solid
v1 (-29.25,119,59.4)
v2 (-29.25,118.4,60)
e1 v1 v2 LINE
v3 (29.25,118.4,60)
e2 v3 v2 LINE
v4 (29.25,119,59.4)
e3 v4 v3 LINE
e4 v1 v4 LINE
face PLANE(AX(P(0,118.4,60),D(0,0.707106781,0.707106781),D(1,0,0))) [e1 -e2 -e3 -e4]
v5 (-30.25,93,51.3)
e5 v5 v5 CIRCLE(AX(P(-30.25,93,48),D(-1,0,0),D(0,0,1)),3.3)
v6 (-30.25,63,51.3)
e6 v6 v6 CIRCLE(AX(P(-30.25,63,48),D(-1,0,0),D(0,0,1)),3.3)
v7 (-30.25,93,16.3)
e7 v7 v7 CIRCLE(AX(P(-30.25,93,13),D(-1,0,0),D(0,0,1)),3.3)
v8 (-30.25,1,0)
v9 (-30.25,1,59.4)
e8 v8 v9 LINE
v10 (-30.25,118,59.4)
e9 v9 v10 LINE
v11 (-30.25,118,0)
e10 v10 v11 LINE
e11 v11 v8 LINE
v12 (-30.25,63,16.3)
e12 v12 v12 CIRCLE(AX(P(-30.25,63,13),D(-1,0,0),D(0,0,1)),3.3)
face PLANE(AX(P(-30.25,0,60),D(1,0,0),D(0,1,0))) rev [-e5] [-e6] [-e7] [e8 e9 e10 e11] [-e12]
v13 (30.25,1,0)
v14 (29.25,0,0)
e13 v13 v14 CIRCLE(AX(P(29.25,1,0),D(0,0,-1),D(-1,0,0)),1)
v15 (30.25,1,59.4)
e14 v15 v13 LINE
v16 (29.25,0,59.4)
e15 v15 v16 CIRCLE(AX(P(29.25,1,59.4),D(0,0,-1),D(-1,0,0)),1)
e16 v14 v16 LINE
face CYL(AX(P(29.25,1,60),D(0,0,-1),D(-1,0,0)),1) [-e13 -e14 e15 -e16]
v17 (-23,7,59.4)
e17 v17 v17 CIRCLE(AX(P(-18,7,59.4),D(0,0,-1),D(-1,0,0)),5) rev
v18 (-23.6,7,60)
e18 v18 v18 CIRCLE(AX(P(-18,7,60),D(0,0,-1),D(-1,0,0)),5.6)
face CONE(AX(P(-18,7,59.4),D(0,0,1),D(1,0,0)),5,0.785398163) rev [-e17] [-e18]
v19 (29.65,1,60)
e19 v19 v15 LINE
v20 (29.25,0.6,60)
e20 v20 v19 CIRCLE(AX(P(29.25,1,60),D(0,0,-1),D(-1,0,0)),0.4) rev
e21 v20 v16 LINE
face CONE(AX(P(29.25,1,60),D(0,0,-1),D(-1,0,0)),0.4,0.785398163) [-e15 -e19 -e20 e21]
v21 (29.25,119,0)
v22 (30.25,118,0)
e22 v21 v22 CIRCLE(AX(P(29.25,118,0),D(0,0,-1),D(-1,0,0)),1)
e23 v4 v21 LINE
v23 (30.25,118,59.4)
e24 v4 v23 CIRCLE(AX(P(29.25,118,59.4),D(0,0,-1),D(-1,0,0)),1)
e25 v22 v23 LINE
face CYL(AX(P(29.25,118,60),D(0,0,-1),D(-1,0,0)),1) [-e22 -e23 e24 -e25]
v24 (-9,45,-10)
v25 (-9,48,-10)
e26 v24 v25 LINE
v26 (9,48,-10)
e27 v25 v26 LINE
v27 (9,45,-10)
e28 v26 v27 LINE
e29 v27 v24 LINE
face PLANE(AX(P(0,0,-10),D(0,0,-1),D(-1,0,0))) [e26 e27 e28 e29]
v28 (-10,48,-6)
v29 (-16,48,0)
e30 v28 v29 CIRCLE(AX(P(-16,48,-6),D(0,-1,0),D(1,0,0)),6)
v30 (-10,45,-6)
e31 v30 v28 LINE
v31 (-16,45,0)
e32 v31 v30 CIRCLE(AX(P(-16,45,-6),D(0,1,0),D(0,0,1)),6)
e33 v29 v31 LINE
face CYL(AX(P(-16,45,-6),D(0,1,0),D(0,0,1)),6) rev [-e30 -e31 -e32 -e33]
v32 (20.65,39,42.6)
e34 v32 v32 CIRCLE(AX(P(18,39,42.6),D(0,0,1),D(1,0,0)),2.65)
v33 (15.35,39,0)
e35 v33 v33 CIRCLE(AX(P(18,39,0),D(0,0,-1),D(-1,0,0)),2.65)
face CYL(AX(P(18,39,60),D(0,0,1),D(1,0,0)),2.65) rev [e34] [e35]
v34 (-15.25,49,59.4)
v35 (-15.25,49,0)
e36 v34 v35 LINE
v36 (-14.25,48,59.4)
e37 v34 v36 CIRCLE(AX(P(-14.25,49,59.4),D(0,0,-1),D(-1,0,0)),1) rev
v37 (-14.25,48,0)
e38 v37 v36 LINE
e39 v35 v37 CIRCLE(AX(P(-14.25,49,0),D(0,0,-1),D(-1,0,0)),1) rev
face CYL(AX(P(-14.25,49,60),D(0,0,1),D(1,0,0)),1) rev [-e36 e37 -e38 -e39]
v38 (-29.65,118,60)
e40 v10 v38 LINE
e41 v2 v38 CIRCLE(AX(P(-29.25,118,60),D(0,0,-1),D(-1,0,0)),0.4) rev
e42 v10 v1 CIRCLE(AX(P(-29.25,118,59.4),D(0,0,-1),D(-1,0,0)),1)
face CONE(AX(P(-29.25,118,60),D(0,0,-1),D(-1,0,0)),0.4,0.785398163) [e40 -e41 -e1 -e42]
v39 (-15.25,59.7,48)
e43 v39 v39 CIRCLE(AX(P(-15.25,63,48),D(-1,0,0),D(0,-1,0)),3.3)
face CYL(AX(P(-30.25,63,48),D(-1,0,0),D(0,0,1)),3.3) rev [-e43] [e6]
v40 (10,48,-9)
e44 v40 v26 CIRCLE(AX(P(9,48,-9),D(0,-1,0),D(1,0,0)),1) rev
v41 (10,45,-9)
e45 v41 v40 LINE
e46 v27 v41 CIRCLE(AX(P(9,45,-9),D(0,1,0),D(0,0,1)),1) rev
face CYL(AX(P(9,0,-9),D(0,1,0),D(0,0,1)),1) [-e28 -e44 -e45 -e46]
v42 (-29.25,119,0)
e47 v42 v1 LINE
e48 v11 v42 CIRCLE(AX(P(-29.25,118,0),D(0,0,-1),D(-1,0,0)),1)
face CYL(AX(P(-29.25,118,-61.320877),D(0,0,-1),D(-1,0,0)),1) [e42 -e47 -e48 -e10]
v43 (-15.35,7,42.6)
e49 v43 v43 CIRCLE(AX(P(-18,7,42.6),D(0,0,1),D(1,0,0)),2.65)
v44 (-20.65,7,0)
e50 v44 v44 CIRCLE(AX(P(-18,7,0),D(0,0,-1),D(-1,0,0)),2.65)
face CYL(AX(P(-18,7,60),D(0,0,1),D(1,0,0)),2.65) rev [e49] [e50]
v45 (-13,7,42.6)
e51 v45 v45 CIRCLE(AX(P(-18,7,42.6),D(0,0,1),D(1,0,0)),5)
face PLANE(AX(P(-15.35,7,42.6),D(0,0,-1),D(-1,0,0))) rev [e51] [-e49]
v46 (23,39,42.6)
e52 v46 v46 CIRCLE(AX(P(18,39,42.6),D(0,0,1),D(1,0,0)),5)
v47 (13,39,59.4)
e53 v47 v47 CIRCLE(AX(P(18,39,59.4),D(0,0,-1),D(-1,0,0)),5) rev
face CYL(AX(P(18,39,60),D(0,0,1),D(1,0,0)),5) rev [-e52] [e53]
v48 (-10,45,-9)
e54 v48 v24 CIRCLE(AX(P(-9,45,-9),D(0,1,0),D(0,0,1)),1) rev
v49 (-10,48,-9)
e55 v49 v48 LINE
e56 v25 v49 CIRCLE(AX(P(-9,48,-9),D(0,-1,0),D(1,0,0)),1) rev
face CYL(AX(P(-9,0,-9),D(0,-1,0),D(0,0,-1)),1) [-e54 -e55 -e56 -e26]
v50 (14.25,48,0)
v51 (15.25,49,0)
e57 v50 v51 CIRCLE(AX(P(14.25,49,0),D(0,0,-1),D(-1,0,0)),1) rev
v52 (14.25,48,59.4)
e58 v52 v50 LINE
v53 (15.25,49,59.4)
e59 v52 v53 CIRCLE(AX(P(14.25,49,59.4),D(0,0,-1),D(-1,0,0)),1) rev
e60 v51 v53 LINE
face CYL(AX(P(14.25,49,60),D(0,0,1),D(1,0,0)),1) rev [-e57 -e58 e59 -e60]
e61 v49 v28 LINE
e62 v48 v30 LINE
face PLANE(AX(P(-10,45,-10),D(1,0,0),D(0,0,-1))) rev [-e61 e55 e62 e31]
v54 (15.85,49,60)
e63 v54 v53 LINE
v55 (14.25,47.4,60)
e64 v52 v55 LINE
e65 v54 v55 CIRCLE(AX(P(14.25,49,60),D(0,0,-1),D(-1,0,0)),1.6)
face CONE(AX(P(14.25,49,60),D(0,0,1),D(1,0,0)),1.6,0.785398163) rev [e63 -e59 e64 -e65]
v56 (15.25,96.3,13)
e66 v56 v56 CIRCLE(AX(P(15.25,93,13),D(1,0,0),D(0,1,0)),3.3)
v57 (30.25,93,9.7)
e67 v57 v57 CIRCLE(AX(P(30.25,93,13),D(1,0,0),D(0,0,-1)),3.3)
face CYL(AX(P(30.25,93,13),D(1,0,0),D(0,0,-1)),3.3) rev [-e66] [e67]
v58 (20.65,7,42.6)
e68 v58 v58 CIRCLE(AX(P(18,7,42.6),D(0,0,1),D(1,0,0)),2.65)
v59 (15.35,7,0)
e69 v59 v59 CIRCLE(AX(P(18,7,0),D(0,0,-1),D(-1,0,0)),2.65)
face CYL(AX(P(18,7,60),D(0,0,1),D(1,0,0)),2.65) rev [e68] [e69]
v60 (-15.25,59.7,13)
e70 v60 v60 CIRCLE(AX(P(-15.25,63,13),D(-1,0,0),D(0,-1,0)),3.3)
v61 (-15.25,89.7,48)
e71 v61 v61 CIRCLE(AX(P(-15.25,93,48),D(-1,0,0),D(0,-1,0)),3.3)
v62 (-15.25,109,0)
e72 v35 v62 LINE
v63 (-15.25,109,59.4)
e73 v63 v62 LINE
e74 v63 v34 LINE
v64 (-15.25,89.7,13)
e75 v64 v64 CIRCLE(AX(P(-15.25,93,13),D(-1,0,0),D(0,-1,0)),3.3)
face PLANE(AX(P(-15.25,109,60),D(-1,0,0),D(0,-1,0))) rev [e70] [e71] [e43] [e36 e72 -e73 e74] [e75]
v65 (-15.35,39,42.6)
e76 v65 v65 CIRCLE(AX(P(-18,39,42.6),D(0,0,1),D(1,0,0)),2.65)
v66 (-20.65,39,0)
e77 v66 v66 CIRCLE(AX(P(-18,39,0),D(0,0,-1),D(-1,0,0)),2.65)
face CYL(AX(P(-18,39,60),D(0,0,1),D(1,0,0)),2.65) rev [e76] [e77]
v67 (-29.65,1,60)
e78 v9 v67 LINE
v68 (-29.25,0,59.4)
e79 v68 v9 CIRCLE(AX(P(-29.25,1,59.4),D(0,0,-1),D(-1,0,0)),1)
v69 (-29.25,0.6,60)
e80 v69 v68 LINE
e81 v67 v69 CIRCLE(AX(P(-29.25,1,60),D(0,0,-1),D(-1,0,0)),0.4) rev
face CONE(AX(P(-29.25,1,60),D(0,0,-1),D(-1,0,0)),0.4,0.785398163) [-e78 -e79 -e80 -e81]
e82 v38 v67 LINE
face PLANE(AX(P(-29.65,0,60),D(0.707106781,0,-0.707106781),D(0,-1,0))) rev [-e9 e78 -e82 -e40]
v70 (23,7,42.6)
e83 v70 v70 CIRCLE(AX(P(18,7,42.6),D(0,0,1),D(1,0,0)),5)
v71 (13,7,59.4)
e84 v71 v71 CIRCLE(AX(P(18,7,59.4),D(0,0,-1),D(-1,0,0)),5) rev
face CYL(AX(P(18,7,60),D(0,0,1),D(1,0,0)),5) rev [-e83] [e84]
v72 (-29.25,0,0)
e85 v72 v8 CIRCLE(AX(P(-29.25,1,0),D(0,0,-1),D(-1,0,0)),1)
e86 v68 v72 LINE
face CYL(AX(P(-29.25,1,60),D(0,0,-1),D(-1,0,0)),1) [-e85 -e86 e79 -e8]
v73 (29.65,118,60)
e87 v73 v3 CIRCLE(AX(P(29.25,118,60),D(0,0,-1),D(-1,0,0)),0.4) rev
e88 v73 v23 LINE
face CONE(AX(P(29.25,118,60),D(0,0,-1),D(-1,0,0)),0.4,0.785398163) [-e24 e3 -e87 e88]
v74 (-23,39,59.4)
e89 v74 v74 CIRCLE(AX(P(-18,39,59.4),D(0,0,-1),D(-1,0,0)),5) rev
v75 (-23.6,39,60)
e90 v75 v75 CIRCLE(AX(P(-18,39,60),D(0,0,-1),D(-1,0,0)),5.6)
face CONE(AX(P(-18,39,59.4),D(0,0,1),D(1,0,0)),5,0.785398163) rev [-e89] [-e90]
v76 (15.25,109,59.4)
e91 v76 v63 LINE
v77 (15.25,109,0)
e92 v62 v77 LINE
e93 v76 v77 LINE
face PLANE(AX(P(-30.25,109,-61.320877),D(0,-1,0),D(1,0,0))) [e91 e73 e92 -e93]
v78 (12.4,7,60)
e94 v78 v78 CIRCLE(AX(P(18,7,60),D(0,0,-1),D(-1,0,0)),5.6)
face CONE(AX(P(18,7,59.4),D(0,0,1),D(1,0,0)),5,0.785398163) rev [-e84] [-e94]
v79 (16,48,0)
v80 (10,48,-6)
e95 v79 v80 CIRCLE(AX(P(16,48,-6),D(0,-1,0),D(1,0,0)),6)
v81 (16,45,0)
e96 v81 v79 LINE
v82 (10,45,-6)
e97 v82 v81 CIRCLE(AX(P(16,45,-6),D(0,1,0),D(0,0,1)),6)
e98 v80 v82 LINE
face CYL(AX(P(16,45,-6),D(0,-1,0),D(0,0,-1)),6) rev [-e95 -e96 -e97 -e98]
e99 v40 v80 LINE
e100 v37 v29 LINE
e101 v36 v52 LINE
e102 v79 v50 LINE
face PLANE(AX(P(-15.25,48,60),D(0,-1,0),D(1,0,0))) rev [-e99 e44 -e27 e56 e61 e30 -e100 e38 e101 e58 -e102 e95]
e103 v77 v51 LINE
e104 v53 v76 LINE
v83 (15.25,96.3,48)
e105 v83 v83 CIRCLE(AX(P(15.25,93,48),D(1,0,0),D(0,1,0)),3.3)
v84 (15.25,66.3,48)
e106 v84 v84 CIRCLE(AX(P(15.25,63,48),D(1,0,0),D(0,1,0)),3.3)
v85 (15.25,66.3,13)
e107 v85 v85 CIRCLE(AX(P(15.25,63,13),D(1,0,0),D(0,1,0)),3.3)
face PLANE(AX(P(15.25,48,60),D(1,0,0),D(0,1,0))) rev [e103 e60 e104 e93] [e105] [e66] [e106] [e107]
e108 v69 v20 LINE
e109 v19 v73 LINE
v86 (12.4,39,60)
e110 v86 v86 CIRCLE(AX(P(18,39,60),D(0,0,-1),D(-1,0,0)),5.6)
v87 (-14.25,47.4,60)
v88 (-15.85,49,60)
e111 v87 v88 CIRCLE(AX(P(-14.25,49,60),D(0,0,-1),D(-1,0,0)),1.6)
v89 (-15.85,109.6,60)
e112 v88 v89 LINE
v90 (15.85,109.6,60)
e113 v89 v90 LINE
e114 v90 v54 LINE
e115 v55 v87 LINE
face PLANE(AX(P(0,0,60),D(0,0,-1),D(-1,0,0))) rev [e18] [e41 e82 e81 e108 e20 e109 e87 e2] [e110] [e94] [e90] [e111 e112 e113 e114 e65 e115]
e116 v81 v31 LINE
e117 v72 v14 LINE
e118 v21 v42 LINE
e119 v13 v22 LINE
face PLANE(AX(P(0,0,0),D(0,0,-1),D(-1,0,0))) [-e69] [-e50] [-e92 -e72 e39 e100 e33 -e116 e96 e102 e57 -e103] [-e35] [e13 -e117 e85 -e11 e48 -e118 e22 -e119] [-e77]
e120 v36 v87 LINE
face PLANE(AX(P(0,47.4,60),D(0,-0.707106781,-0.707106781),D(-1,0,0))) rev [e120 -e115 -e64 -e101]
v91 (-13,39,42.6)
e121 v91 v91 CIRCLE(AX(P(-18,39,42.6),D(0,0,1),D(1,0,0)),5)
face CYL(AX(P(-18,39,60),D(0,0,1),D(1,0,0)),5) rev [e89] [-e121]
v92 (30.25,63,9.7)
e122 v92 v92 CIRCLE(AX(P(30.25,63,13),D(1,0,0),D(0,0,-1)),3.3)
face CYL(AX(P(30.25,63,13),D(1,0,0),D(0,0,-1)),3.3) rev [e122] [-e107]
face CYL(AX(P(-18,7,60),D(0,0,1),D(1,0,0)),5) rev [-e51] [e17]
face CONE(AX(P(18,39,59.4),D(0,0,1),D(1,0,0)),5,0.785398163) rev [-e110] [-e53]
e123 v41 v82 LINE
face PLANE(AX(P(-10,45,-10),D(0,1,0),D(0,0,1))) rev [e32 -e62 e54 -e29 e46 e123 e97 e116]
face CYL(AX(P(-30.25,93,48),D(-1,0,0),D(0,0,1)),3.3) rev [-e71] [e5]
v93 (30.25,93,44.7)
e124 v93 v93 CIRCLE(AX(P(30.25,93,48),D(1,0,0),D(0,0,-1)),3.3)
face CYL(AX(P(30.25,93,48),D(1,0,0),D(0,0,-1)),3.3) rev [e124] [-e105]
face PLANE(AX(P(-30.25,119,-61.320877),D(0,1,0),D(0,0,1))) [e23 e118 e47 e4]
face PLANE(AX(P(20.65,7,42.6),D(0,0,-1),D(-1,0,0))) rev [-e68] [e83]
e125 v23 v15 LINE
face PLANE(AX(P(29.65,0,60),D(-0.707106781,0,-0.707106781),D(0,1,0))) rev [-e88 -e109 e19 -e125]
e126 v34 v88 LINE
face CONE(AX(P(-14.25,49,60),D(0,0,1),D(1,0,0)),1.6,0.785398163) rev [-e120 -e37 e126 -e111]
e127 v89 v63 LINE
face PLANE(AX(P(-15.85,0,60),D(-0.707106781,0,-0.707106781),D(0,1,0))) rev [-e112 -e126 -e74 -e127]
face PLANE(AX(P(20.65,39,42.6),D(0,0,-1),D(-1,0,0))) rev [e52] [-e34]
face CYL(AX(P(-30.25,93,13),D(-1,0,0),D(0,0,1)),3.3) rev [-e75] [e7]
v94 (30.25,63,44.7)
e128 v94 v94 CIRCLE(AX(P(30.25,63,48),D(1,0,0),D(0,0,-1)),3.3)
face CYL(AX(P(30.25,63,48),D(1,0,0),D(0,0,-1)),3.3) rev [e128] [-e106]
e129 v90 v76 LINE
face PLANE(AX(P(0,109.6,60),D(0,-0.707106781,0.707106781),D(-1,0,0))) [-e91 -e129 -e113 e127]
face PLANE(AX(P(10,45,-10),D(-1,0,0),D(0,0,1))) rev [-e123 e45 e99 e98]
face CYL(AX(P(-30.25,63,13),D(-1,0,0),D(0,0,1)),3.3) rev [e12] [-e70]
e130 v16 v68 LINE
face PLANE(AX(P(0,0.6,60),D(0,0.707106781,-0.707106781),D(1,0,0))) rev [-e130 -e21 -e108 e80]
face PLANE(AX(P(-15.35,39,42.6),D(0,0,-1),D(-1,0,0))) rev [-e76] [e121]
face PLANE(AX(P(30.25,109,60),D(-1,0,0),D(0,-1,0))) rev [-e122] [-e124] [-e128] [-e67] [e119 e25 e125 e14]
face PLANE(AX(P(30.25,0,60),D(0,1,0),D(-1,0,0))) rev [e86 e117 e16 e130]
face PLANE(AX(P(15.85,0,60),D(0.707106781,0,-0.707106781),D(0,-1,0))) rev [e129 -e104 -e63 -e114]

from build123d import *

# Parameters (mm, degrees)
BOSS_EXTRUDE1_DEPTH                                 = 60
CBORE_FOR_M5_HEX_SOCKET_HEAD_CAP_SCREW1_D           = 5.3
CBORE_FOR_M5_HEX_SOCKET_HEAD_CAP_SCREW1_CBORE_D     = 10
CBORE_FOR_M5_HEX_SOCKET_HEAD_CAP_SCREW1_CBORE_DEPTH = 17.4
M6_CLEARANCE_HOLE1_D                                = 6.6
M6_CLEARANCE_HOLE1_DEPTH                            = 15
SKETCH8_W                                           = 20
SKETCH8_H                                           = 3
BOSS_EXTRUDE2_DEPTH                                 = 10
SKETCH9_W                                           = 60.5
SKETCH9_H                                           = 10
BOSS_EXTRUDE3_DEPTH                                 = 60
FILLET1_R                                           = 1
FILLET2_R                                           = 6
FILLET2_R_2                                         = 1
CHAMFER1_SIZE                                       = 0.6


with BuildPart() as part:
    # Sketch1 → Boss-Extrude1 (new body)
    with BuildSketch(Plane.XY):
        Polygon((30.25, 0), (-30.25, 0), (-30.25, 109), (-15.25, 109), (-15.25, 48), (15.25, 48), (15.25, 109), (30.25, 109), align=None)
    extrude(amount=BOSS_EXTRUDE1_DEPTH)

    # CBORE for M5 Hex Socket Head Cap Screw1 (through all)
    with Locations(Plane.XY.offset(60)):
        with Locations((-18, 7), (18, 7), (18, 39), (-18, 39)):
            CounterBoreHole(CBORE_FOR_M5_HEX_SOCKET_HEAD_CAP_SCREW1_D / 2, CBORE_FOR_M5_HEX_SOCKET_HEAD_CAP_SCREW1_CBORE_D / 2, CBORE_FOR_M5_HEX_SOCKET_HEAD_CAP_SCREW1_CBORE_DEPTH)

    # M6 Clearance Hole1
    with Locations(Plane.ZY.offset(30.25)):
        with Locations((48, 93), (13, 93), (13, 63), (48, 63)):
            m6_clearance_hole1 = Hole(M6_CLEARANCE_HOLE1_D / 2, depth=M6_CLEARANCE_HOLE1_DEPTH)

    # Mirror1: M6 Clearance Hole1 across plane
    add(m6_clearance_hole1.mirror(Plane(origin=(0, 0, 0), x_dir=(0, 0, 1), z_dir=(1, 0, 0))), mode=Mode.SUBTRACT)

    # Sketch8 → Boss-Extrude2 (add)
    with BuildSketch(Plane(origin=(0, 0, 0), x_dir=(-1, 0, 0), z_dir=(0, 0, -1))):
        with Locations((0, 46.5)):
            Rectangle(SKETCH8_W, SKETCH8_H)
    extrude(amount=BOSS_EXTRUDE2_DEPTH)

    # Sketch9 → Boss-Extrude3 (add)
    with BuildSketch(Plane.XY.offset(60)):
        with Locations((0, 114)):
            Rectangle(SKETCH9_W, SKETCH9_H)
    extrude(amount=-BOSS_EXTRUDE3_DEPTH)

    # Fillet1
    fillet1_edges = [part.edges().sort_by_distance(p)[0] for p in [
        (30.25, 119, 30),
        (-30.25, 119, 30),
        (-15.25, 48, 30),
        (15.25, 48, 30),
        (30.25, 0, 30),
        (-30.25, 0, 30),
    ]]
    fillet(fillet1_edges, radius=FILLET1_R)

    # Fillet2
    # the kernel refuses this fillet: 6, 1 mm, written as the material it adds along each edge
    with BuildSketch(Plane(origin=(10, 45, 0), x_dir=(1, 0, 0), z_dir=(0, 1, 0)), Plane(origin=(-10, 48, 0), x_dir=(-1, 0, 0), z_dir=(0, -1, 0))) as fillet2_piece_1:
        with BuildLine():
            CenterArc((FILLET2_R, FILLET2_R), FILLET2_R, 180, 90)
            Line((0, FILLET2_R), (0, 0))
            Line((0, 0), (FILLET2_R, 0))
        make_face()
    extrude(amount=3)
    # the kernel refuses this fillet: 6, 1 mm, written as the material it takes off along each edge
    with BuildSketch(Plane(origin=(10, 42.5, -10), x_dir=(-1, 0, 0), z_dir=(0, 1, 0))) as fillet2_2_piece_1:
        with BuildLine():
            CenterArc((FILLET2_R_2, FILLET2_R_2), FILLET2_R_2, 180, 90)
            Line((0, FILLET2_R_2), (0, 0))
            Line((0, 0), (FILLET2_R_2, 0))
        make_face()
    extrude(amount=8, mode=Mode.SUBTRACT)
    with BuildSketch(Plane(origin=(-10, 50.5, -10), x_dir=(0, 0, 1), z_dir=(0, -1, 0))) as fillet2_2_piece_2:
        with BuildLine():
            CenterArc((FILLET2_R_2, -FILLET2_R_2), FILLET2_R_2, 90, 90)
            Line((0, -FILLET2_R_2), (0, 0))
            Line((0, 0), (FILLET2_R_2, 0))
        make_face()
    extrude(amount=8, mode=Mode.SUBTRACT)

    # Chamfer1
    chamfer1_edges = [part.edges().sort_by_distance(p)[0] for p in [
        (0, 109, 60),
        (0, 119, 60),
        (-30.25, 59.5, 60),
        (0, 0, 60),
        (30.25, 59.5, 60),
        (-15.25, 79, 60),
        (0, 48, 60),
        (-29.957106781, 0.292893219, 60),
        (29.957106781, 0.292893219, 60),
        (29.957106781, 118.707106781, 60),
        (-29.957106781, 118.707106781, 60),
        (14.957106781, 48.292893219, 60),
        (-14.957106781, 48.292893219, 60),
        (15.25, 79, 60),
        (-23, 39, 60),
        (13, 39, 60),
        (13, 7, 60),
        (-23, 7, 60),
    ]]
    chamfer(chamfer1_edges, length=CHAMFER1_SIZE)


solid = part.part
